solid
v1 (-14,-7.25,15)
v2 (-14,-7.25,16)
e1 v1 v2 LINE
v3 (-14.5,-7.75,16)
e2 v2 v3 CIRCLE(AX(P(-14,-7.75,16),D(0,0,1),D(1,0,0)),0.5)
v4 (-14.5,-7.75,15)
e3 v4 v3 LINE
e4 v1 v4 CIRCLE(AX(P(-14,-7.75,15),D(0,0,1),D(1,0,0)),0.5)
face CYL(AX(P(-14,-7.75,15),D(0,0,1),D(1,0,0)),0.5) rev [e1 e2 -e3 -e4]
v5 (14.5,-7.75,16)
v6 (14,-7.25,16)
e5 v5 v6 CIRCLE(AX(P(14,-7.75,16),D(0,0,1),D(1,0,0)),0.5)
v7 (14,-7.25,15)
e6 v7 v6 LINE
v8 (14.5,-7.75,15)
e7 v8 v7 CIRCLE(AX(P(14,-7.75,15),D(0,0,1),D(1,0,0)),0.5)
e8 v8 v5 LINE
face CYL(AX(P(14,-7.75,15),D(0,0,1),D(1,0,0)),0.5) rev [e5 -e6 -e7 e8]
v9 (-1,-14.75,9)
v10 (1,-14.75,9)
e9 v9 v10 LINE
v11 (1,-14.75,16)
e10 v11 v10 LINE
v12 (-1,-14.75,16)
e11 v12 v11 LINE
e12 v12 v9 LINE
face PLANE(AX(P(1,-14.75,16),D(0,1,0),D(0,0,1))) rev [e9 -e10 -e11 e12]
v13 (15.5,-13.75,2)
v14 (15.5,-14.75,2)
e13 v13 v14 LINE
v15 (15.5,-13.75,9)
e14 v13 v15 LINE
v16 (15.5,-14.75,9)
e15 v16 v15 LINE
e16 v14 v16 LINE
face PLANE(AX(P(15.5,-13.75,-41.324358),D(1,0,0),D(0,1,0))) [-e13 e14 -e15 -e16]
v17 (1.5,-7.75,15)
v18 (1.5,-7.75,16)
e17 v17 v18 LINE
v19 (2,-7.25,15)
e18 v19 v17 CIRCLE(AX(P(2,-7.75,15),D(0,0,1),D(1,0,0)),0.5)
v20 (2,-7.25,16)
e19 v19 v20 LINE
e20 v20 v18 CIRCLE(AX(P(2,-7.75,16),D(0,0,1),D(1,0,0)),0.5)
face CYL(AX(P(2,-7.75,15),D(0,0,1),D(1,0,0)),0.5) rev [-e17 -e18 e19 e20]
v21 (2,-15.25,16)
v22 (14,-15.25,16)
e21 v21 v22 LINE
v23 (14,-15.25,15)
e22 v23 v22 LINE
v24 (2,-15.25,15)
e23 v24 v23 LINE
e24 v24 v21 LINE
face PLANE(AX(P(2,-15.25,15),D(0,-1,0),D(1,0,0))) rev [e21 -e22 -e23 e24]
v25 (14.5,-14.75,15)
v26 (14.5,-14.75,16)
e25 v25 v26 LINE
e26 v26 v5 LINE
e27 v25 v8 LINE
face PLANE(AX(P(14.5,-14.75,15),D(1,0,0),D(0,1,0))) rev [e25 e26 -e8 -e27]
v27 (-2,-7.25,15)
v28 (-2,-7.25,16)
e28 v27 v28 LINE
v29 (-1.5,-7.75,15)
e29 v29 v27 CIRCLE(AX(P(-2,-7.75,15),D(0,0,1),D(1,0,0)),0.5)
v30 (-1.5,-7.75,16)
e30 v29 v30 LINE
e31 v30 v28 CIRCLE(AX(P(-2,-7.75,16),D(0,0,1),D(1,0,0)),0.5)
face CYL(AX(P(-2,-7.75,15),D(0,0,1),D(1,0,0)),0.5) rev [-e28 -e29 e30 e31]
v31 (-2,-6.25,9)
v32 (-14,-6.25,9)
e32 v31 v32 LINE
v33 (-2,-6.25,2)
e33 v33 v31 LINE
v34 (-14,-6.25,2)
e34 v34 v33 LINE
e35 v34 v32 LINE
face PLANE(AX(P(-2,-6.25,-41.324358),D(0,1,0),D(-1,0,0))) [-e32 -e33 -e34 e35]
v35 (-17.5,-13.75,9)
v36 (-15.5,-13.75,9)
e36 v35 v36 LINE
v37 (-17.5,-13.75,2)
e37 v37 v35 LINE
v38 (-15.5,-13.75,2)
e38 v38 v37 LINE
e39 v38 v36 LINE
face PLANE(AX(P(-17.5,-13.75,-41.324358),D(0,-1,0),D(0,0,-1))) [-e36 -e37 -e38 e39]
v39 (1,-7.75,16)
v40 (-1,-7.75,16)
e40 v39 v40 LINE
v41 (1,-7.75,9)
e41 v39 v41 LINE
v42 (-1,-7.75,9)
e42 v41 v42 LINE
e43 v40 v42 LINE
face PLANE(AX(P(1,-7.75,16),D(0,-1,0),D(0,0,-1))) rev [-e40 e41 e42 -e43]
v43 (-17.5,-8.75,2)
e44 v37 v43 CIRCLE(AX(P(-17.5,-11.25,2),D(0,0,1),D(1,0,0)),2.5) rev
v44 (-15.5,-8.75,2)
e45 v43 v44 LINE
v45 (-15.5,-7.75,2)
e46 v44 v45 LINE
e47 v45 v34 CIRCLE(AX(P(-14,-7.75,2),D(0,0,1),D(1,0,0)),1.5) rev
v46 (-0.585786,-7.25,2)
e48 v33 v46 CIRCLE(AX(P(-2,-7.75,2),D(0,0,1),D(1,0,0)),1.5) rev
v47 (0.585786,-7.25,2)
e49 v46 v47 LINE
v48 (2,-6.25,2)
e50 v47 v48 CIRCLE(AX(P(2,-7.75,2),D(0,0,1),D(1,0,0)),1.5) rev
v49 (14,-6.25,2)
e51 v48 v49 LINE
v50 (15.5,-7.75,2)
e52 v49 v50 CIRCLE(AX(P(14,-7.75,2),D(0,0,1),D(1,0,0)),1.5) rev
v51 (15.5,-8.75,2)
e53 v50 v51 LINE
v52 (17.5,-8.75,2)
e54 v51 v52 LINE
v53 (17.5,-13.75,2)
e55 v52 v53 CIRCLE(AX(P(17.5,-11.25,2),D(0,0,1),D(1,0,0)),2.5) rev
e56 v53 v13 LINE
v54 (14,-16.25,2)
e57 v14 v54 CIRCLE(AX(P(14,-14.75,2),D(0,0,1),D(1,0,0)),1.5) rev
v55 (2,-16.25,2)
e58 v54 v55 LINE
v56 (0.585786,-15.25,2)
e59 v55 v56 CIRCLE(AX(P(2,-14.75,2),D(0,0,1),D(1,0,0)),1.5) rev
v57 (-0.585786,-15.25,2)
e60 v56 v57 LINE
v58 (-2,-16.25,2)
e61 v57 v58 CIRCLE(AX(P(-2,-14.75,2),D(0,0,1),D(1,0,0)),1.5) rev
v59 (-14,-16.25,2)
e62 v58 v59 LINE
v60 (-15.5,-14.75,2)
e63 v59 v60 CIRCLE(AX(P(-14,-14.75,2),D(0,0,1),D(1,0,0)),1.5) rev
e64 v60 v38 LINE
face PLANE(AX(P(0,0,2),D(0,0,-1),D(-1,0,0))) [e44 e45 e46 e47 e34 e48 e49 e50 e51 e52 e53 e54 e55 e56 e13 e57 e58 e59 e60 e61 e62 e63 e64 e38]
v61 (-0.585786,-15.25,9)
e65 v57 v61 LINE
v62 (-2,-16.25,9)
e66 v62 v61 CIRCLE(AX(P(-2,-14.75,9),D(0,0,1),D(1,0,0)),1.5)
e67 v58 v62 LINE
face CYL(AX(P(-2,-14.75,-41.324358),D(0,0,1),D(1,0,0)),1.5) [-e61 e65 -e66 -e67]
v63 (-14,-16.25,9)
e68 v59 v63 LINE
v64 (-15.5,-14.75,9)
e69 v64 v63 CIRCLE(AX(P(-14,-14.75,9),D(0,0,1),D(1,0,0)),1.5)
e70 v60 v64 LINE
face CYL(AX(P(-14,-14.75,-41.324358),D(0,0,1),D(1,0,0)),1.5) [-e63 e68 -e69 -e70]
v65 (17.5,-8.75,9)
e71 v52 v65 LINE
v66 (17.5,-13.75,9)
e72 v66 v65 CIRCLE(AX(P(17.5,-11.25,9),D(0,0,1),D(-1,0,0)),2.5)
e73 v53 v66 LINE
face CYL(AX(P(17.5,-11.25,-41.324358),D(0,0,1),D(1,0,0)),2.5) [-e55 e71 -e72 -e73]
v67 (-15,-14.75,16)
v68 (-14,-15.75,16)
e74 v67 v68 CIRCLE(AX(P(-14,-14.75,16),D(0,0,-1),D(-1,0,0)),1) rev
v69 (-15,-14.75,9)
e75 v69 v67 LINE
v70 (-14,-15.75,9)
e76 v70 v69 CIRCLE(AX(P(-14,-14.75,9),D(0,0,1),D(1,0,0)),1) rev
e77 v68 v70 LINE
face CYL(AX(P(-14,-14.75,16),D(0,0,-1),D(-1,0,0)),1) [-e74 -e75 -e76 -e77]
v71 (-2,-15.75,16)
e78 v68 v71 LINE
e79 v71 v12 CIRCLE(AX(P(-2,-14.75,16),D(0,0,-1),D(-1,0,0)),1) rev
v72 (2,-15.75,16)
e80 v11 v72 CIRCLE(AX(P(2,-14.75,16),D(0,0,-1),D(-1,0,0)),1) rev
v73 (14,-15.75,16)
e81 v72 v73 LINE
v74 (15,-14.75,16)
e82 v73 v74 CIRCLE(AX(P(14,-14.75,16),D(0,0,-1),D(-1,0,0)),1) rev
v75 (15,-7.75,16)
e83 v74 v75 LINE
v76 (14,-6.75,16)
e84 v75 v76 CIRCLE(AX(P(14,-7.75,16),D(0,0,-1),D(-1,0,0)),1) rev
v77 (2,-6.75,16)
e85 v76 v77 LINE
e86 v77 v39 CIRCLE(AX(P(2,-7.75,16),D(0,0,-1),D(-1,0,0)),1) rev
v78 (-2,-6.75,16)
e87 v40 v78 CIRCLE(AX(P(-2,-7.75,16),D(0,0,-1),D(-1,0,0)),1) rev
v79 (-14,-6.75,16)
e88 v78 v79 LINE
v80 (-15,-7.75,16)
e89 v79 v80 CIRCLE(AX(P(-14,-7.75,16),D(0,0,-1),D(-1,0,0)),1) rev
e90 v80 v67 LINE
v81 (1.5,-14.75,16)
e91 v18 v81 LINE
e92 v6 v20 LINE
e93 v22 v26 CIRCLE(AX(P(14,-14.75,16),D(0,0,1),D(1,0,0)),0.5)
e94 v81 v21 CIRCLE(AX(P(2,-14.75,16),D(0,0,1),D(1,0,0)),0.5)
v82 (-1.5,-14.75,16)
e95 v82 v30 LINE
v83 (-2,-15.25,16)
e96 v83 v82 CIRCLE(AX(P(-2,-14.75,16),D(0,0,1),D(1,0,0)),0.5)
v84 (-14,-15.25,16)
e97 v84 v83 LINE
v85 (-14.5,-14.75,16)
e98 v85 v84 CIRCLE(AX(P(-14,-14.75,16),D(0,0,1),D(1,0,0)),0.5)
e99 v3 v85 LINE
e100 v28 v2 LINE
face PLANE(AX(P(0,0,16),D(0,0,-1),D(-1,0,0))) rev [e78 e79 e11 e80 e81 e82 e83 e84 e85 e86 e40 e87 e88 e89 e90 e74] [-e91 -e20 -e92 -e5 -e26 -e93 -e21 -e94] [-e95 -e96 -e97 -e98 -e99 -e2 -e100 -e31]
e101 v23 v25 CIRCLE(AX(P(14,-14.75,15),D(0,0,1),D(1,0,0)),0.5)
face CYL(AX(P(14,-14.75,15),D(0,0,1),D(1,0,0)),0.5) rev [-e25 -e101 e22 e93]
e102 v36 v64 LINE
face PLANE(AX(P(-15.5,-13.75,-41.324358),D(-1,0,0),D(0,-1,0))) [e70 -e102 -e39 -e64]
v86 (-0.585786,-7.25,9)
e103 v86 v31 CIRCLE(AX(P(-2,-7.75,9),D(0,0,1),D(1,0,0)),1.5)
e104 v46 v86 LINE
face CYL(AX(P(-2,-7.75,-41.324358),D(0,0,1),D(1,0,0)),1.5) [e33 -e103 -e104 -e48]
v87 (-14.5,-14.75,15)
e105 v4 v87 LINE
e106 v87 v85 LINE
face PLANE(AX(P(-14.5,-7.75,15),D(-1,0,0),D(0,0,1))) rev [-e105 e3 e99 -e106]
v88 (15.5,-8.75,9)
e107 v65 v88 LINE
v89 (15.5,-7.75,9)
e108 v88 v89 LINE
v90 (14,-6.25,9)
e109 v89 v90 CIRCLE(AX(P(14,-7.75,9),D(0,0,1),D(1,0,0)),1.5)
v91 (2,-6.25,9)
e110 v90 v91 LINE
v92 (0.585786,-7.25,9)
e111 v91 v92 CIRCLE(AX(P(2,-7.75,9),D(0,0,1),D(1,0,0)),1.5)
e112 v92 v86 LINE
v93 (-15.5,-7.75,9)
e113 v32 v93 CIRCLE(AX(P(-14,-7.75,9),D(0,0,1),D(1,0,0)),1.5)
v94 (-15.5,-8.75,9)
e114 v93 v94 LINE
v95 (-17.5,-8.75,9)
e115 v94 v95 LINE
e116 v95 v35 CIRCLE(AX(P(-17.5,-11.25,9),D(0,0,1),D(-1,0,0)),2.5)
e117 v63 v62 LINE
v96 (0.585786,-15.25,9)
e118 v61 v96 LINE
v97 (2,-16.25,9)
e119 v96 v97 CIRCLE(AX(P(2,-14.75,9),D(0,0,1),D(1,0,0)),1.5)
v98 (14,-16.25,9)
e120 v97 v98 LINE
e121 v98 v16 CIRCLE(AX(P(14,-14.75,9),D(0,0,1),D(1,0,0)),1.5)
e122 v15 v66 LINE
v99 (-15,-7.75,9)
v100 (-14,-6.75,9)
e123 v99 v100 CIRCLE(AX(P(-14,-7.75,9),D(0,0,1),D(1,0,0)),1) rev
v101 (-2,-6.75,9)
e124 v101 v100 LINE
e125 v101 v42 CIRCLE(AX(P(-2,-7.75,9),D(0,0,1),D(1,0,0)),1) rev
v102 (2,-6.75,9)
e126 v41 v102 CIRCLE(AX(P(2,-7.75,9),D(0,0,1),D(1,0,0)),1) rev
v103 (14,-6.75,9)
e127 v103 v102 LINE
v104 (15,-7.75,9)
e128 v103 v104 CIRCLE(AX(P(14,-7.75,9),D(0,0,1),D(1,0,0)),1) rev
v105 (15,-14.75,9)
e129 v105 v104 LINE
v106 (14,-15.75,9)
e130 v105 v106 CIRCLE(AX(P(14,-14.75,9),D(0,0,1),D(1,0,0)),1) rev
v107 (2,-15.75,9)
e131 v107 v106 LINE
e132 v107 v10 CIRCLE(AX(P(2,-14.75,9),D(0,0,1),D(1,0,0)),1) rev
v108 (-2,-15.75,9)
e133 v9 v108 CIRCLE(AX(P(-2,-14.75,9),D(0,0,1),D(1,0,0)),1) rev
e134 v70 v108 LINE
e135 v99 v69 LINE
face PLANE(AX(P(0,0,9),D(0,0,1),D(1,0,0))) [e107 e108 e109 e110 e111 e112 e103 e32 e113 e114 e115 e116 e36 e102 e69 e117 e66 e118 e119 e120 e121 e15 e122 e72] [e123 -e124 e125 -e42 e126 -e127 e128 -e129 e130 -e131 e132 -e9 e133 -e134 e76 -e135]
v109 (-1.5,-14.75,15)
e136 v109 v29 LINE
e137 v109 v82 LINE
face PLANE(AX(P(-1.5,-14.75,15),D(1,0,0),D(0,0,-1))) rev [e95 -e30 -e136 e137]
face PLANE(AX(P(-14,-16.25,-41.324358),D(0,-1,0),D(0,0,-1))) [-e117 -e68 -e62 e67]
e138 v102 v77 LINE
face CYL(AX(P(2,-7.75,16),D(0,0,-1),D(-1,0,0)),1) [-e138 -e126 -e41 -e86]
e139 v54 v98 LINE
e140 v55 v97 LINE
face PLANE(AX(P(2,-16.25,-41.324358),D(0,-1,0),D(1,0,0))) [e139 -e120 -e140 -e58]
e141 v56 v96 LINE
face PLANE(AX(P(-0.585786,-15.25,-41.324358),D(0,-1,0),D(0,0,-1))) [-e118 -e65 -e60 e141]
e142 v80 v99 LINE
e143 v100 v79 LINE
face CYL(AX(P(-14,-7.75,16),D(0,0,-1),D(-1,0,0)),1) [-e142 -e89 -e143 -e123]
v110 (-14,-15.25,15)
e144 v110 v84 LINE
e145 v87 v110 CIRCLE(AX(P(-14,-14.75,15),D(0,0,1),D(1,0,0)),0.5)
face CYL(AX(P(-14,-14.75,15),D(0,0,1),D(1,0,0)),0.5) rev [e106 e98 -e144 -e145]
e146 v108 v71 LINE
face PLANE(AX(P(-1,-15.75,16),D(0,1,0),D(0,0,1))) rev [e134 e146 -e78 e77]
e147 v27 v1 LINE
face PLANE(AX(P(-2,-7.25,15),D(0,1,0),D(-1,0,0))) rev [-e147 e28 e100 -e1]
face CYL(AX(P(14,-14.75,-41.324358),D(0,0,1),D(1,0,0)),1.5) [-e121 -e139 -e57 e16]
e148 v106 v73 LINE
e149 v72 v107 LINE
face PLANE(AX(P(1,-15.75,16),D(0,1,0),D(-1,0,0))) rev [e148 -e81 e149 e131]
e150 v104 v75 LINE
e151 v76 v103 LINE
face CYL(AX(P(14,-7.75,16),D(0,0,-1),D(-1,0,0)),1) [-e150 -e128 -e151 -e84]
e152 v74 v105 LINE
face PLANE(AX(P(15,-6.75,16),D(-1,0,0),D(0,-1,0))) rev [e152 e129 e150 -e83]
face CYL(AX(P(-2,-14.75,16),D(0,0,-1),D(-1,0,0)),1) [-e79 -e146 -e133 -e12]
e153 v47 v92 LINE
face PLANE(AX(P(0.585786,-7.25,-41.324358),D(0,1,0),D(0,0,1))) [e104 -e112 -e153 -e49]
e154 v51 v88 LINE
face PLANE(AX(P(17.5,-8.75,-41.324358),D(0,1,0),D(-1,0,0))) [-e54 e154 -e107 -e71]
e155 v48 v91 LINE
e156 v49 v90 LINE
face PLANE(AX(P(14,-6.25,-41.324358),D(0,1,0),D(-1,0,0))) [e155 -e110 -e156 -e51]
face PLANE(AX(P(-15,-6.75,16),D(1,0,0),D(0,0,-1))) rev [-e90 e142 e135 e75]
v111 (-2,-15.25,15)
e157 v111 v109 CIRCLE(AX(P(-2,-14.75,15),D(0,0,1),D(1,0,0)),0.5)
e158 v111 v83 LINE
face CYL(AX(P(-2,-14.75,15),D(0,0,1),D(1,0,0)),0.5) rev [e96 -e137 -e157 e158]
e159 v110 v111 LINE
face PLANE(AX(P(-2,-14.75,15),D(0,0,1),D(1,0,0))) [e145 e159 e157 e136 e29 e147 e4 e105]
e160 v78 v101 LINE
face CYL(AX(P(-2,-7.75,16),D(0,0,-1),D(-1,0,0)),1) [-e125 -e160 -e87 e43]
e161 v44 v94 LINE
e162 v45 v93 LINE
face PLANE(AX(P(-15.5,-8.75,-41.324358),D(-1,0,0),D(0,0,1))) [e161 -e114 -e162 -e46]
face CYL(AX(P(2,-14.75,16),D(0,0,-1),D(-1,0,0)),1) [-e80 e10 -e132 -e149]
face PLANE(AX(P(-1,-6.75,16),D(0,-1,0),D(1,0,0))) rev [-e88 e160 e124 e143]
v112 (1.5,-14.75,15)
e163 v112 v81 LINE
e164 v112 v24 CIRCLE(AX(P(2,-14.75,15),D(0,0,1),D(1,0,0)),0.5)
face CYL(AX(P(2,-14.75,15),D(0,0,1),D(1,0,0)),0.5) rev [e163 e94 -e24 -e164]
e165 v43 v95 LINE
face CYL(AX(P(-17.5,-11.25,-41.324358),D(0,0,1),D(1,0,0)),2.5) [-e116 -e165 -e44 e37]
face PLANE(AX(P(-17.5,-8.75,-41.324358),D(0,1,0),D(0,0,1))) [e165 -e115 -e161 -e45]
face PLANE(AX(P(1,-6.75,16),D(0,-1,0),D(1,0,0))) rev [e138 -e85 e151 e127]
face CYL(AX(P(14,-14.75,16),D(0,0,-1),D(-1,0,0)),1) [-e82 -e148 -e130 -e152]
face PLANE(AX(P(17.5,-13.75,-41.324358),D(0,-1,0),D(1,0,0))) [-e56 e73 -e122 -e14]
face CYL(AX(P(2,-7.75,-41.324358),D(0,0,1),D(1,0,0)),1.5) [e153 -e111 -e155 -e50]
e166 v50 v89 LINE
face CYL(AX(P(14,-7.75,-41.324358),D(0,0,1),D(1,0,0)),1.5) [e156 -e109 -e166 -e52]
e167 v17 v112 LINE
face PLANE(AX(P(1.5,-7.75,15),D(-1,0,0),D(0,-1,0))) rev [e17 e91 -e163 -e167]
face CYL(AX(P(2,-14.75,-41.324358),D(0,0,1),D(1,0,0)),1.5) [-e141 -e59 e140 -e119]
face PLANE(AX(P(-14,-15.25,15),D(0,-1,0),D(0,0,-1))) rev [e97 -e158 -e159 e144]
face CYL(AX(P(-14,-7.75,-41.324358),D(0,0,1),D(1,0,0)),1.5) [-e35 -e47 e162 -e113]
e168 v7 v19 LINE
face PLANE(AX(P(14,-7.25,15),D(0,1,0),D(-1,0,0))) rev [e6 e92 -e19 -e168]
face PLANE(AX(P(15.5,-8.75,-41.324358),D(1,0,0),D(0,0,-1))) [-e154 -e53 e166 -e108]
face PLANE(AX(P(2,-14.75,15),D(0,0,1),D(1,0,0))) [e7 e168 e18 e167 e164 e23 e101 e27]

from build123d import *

# Parameters (mm, degrees)
SKETCH1_W           = 45
SKETCH1_H           = 37.5
BOSS_EXTRUDE1_DEPTH = 2
SKETCH2_W           = 40
SKETCH2_H           = 13
BOSS_EXTRUDE2_DEPTH = 7
BOSS_EXTRUDE3_DEPTH = 7
FILLET1_R           = 1
CUT_EXTRUDE1_DEPTH  = 1
SKETCH5_W           = 41
SKETCH5_H           = 14
CUT_EXTRUDE2_DEPTH  = 7
SKETCH6_W           = 11
SKETCH6_H           = 20
BOSS_EXTRUDE5_DEPTH = 12
SKETCH7_W           = 9
SKETCH7_H           = 9
CUT_EXTRUDE3_DEPTH  = 12
SKETCH8_W           = 132.830335996
SKETCH8_H           = 96.675499104
CUT_EXTRUDE4_DEPTH  = 20


with BuildPart() as part:
    # Sketch1 → Boss-Extrude1 (new body)
    with BuildSketch(Plane.XY):
        Rectangle(SKETCH1_W, SKETCH1_H)
    extrude(amount=BOSS_EXTRUDE1_DEPTH)

    # Sketch2 → Boss-Extrude2 (add)
    with BuildSketch(Plane.XY.offset(2)):
        with Locations((0, -11.25)):
            Rectangle(SKETCH2_W, SKETCH2_H)
    extrude(amount=BOSS_EXTRUDE2_DEPTH)

    # Sketch3 → Boss-Extrude3 (add)
    with BuildSketch(Plane.XY.offset(9)):
        Polygon((-1, -7.75), (-1, -6.75), (-15, -6.75), (-15, -15.75), (-1, -15.75), (-1, -14.75), (1, -14.75), (1, -15.75), (15, -15.75), (15, -6.75), (1, -6.75), (1, -7.75), align=None)
    extrude(amount=BOSS_EXTRUDE3_DEPTH)

    # Fillet1
    fillet1_edges = [part.edges().sort_by_distance(p)[0] for p in [
        (-15, -15.75, 12.5),
        (-1, -15.75, 12.5),
        (1, -15.75, 12.5),
        (-15, -6.75, 12.5),
        (15, -15.75, 12.5),
        (15, -6.75, 12.5),
        (1, -6.75, 12.5),
        (-1, -6.75, 12.5),
    ]]
    fillet(fillet1_edges, radius=FILLET1_R - 0.0001)  # a hair under: the kernel refuses the full size

    # Sketch4 → Cut-Extrude1 (cut)
    with BuildSketch(Plane.XY.offset(16)):
        with BuildLine():
            Line((-1.5, -14.75), (-1.5, -7.75))
            ThreePointArc((-1.5, -7.75), (-1.646446609, -7.396446609), (-2, -7.25))
            Line((-2, -7.25), (-14, -7.25))
            ThreePointArc((-14, -7.25), (-14.353553391, -7.396446609), (-14.5, -7.75))
            Line((-14.5, -7.75), (-14.5, -14.75))
            ThreePointArc((-14.5, -14.75), (-14.353553391, -15.103553391), (-14, -15.25))
            Line((-14, -15.25), (-2, -15.25))
            ThreePointArc((-2, -15.25), (-1.646446609, -15.103553391), (-1.5, -14.75))
        make_face()
        with BuildLine():
            Line((1.5, -7.75), (1.5, -14.75))
            ThreePointArc((1.5, -14.75), (1.646446609, -15.103553391), (2, -15.25))
            Line((2, -15.25), (14, -15.25))
            ThreePointArc((14, -15.25), (14.353553391, -15.103553391), (14.5, -14.75))
            Line((14.5, -14.75), (14.5, -7.75))
            ThreePointArc((14.5, -7.75), (14.353553391, -7.396446609), (14, -7.25))
            Line((14, -7.25), (2, -7.25))
            ThreePointArc((2, -7.25), (1.646446609, -7.396446609), (1.5, -7.75))
        make_face()
    extrude(amount=-CUT_EXTRUDE1_DEPTH, mode=Mode.SUBTRACT)

    # Sketch5 → Cut-Extrude2 (cut)
    with BuildSketch(Plane.XY.offset(9)):
        with Locations((0, -11.25)):
            Rectangle(SKETCH5_W, SKETCH5_H)
        with BuildLine():
            Line((-17.5, -8.75), (-15.5, -8.75))
            Line((-15.5, -8.75), (-15.5, -7.75))
            ThreePointArc((-15.5, -7.75), (-15.060660172, -6.689339828), (-14, -6.25))
            Line((-14, -6.25), (-2, -6.25))
            ThreePointArc((-2, -6.25), (-1.133974596, -6.525255129), (-0.585786438, -7.25))
            Line((-0.585786438, -7.25), (0.585786438, -7.25))
            ThreePointArc((0.585786438, -7.25), (1.133974596, -6.525255129), (2, -6.25))
            Line((2, -6.25), (14, -6.25))
            ThreePointArc((14, -6.25), (15.060660172, -6.689339828), (15.5, -7.75))
            Line((15.5, -7.75), (15.5, -8.75))
            Line((15.5, -8.75), (17.5, -8.75))
            ThreePointArc((17.5, -8.75), (20, -11.25), (17.5, -13.75))
            Line((17.5, -13.75), (15.5, -13.75))
            Line((15.5, -13.75), (15.5, -14.75))
            ThreePointArc((15.5, -14.75), (15.060660172, -15.810660172), (14, -16.25))
            Line((14, -16.25), (2, -16.25))
            ThreePointArc((2, -16.25), (1.133974596, -15.974744871), (0.585786438, -15.25))
            Line((0.585786438, -15.25), (-0.585786438, -15.25))
            ThreePointArc((-0.585786438, -15.25), (-1.133974596, -15.974744871), (-2, -16.25))
            Line((-2, -16.25), (-14, -16.25))
            ThreePointArc((-14, -16.25), (-15.060660172, -15.810660172), (-15.5, -14.75))
            Line((-15.5, -14.75), (-15.5, -13.75))
            Line((-15.5, -13.75), (-17.5, -13.75))
            ThreePointArc((-17.5, -13.75), (-20, -11.25), (-17.5, -8.75))
        make_face(mode=Mode.SUBTRACT)
    extrude(amount=-CUT_EXTRUDE2_DEPTH, mode=Mode.SUBTRACT)

    # Sketch6 → Boss-Extrude5 (add)
    with BuildSketch(Plane(origin=(0, 0, 0), x_dir=(-1, 0, 0), z_dir=(0, 0, -1))):
        with Locations((-6, 8.25)):
            Rectangle(SKETCH6_W, SKETCH6_H)
        with Locations((6, 8.25)):
            Rectangle(SKETCH6_W, SKETCH6_H)
    extrude(amount=BOSS_EXTRUDE5_DEPTH)

    # Sketch7 → Cut-Extrude3 (cut)
    with BuildSketch(Plane(origin=(0, 18.25, 0), x_dir=(1, 0, 0), z_dir=(0, 1, 0))):
        with Locations((-6, 5.5)):
            Rectangle(SKETCH7_W, SKETCH7_H)
        with Locations((6, 5.5)):
            Rectangle(SKETCH7_W, SKETCH7_H)
    extrude(amount=-CUT_EXTRUDE3_DEPTH, mode=Mode.SUBTRACT)

    # Sketch8 → Cut-Extrude4 (cut)
    with BuildSketch(Plane.XY.offset(2)):
        Rectangle(SKETCH8_W, SKETCH8_H)
    extrude(amount=-CUT_EXTRUDE4_DEPTH, mode=Mode.SUBTRACT)


solid = part.part
